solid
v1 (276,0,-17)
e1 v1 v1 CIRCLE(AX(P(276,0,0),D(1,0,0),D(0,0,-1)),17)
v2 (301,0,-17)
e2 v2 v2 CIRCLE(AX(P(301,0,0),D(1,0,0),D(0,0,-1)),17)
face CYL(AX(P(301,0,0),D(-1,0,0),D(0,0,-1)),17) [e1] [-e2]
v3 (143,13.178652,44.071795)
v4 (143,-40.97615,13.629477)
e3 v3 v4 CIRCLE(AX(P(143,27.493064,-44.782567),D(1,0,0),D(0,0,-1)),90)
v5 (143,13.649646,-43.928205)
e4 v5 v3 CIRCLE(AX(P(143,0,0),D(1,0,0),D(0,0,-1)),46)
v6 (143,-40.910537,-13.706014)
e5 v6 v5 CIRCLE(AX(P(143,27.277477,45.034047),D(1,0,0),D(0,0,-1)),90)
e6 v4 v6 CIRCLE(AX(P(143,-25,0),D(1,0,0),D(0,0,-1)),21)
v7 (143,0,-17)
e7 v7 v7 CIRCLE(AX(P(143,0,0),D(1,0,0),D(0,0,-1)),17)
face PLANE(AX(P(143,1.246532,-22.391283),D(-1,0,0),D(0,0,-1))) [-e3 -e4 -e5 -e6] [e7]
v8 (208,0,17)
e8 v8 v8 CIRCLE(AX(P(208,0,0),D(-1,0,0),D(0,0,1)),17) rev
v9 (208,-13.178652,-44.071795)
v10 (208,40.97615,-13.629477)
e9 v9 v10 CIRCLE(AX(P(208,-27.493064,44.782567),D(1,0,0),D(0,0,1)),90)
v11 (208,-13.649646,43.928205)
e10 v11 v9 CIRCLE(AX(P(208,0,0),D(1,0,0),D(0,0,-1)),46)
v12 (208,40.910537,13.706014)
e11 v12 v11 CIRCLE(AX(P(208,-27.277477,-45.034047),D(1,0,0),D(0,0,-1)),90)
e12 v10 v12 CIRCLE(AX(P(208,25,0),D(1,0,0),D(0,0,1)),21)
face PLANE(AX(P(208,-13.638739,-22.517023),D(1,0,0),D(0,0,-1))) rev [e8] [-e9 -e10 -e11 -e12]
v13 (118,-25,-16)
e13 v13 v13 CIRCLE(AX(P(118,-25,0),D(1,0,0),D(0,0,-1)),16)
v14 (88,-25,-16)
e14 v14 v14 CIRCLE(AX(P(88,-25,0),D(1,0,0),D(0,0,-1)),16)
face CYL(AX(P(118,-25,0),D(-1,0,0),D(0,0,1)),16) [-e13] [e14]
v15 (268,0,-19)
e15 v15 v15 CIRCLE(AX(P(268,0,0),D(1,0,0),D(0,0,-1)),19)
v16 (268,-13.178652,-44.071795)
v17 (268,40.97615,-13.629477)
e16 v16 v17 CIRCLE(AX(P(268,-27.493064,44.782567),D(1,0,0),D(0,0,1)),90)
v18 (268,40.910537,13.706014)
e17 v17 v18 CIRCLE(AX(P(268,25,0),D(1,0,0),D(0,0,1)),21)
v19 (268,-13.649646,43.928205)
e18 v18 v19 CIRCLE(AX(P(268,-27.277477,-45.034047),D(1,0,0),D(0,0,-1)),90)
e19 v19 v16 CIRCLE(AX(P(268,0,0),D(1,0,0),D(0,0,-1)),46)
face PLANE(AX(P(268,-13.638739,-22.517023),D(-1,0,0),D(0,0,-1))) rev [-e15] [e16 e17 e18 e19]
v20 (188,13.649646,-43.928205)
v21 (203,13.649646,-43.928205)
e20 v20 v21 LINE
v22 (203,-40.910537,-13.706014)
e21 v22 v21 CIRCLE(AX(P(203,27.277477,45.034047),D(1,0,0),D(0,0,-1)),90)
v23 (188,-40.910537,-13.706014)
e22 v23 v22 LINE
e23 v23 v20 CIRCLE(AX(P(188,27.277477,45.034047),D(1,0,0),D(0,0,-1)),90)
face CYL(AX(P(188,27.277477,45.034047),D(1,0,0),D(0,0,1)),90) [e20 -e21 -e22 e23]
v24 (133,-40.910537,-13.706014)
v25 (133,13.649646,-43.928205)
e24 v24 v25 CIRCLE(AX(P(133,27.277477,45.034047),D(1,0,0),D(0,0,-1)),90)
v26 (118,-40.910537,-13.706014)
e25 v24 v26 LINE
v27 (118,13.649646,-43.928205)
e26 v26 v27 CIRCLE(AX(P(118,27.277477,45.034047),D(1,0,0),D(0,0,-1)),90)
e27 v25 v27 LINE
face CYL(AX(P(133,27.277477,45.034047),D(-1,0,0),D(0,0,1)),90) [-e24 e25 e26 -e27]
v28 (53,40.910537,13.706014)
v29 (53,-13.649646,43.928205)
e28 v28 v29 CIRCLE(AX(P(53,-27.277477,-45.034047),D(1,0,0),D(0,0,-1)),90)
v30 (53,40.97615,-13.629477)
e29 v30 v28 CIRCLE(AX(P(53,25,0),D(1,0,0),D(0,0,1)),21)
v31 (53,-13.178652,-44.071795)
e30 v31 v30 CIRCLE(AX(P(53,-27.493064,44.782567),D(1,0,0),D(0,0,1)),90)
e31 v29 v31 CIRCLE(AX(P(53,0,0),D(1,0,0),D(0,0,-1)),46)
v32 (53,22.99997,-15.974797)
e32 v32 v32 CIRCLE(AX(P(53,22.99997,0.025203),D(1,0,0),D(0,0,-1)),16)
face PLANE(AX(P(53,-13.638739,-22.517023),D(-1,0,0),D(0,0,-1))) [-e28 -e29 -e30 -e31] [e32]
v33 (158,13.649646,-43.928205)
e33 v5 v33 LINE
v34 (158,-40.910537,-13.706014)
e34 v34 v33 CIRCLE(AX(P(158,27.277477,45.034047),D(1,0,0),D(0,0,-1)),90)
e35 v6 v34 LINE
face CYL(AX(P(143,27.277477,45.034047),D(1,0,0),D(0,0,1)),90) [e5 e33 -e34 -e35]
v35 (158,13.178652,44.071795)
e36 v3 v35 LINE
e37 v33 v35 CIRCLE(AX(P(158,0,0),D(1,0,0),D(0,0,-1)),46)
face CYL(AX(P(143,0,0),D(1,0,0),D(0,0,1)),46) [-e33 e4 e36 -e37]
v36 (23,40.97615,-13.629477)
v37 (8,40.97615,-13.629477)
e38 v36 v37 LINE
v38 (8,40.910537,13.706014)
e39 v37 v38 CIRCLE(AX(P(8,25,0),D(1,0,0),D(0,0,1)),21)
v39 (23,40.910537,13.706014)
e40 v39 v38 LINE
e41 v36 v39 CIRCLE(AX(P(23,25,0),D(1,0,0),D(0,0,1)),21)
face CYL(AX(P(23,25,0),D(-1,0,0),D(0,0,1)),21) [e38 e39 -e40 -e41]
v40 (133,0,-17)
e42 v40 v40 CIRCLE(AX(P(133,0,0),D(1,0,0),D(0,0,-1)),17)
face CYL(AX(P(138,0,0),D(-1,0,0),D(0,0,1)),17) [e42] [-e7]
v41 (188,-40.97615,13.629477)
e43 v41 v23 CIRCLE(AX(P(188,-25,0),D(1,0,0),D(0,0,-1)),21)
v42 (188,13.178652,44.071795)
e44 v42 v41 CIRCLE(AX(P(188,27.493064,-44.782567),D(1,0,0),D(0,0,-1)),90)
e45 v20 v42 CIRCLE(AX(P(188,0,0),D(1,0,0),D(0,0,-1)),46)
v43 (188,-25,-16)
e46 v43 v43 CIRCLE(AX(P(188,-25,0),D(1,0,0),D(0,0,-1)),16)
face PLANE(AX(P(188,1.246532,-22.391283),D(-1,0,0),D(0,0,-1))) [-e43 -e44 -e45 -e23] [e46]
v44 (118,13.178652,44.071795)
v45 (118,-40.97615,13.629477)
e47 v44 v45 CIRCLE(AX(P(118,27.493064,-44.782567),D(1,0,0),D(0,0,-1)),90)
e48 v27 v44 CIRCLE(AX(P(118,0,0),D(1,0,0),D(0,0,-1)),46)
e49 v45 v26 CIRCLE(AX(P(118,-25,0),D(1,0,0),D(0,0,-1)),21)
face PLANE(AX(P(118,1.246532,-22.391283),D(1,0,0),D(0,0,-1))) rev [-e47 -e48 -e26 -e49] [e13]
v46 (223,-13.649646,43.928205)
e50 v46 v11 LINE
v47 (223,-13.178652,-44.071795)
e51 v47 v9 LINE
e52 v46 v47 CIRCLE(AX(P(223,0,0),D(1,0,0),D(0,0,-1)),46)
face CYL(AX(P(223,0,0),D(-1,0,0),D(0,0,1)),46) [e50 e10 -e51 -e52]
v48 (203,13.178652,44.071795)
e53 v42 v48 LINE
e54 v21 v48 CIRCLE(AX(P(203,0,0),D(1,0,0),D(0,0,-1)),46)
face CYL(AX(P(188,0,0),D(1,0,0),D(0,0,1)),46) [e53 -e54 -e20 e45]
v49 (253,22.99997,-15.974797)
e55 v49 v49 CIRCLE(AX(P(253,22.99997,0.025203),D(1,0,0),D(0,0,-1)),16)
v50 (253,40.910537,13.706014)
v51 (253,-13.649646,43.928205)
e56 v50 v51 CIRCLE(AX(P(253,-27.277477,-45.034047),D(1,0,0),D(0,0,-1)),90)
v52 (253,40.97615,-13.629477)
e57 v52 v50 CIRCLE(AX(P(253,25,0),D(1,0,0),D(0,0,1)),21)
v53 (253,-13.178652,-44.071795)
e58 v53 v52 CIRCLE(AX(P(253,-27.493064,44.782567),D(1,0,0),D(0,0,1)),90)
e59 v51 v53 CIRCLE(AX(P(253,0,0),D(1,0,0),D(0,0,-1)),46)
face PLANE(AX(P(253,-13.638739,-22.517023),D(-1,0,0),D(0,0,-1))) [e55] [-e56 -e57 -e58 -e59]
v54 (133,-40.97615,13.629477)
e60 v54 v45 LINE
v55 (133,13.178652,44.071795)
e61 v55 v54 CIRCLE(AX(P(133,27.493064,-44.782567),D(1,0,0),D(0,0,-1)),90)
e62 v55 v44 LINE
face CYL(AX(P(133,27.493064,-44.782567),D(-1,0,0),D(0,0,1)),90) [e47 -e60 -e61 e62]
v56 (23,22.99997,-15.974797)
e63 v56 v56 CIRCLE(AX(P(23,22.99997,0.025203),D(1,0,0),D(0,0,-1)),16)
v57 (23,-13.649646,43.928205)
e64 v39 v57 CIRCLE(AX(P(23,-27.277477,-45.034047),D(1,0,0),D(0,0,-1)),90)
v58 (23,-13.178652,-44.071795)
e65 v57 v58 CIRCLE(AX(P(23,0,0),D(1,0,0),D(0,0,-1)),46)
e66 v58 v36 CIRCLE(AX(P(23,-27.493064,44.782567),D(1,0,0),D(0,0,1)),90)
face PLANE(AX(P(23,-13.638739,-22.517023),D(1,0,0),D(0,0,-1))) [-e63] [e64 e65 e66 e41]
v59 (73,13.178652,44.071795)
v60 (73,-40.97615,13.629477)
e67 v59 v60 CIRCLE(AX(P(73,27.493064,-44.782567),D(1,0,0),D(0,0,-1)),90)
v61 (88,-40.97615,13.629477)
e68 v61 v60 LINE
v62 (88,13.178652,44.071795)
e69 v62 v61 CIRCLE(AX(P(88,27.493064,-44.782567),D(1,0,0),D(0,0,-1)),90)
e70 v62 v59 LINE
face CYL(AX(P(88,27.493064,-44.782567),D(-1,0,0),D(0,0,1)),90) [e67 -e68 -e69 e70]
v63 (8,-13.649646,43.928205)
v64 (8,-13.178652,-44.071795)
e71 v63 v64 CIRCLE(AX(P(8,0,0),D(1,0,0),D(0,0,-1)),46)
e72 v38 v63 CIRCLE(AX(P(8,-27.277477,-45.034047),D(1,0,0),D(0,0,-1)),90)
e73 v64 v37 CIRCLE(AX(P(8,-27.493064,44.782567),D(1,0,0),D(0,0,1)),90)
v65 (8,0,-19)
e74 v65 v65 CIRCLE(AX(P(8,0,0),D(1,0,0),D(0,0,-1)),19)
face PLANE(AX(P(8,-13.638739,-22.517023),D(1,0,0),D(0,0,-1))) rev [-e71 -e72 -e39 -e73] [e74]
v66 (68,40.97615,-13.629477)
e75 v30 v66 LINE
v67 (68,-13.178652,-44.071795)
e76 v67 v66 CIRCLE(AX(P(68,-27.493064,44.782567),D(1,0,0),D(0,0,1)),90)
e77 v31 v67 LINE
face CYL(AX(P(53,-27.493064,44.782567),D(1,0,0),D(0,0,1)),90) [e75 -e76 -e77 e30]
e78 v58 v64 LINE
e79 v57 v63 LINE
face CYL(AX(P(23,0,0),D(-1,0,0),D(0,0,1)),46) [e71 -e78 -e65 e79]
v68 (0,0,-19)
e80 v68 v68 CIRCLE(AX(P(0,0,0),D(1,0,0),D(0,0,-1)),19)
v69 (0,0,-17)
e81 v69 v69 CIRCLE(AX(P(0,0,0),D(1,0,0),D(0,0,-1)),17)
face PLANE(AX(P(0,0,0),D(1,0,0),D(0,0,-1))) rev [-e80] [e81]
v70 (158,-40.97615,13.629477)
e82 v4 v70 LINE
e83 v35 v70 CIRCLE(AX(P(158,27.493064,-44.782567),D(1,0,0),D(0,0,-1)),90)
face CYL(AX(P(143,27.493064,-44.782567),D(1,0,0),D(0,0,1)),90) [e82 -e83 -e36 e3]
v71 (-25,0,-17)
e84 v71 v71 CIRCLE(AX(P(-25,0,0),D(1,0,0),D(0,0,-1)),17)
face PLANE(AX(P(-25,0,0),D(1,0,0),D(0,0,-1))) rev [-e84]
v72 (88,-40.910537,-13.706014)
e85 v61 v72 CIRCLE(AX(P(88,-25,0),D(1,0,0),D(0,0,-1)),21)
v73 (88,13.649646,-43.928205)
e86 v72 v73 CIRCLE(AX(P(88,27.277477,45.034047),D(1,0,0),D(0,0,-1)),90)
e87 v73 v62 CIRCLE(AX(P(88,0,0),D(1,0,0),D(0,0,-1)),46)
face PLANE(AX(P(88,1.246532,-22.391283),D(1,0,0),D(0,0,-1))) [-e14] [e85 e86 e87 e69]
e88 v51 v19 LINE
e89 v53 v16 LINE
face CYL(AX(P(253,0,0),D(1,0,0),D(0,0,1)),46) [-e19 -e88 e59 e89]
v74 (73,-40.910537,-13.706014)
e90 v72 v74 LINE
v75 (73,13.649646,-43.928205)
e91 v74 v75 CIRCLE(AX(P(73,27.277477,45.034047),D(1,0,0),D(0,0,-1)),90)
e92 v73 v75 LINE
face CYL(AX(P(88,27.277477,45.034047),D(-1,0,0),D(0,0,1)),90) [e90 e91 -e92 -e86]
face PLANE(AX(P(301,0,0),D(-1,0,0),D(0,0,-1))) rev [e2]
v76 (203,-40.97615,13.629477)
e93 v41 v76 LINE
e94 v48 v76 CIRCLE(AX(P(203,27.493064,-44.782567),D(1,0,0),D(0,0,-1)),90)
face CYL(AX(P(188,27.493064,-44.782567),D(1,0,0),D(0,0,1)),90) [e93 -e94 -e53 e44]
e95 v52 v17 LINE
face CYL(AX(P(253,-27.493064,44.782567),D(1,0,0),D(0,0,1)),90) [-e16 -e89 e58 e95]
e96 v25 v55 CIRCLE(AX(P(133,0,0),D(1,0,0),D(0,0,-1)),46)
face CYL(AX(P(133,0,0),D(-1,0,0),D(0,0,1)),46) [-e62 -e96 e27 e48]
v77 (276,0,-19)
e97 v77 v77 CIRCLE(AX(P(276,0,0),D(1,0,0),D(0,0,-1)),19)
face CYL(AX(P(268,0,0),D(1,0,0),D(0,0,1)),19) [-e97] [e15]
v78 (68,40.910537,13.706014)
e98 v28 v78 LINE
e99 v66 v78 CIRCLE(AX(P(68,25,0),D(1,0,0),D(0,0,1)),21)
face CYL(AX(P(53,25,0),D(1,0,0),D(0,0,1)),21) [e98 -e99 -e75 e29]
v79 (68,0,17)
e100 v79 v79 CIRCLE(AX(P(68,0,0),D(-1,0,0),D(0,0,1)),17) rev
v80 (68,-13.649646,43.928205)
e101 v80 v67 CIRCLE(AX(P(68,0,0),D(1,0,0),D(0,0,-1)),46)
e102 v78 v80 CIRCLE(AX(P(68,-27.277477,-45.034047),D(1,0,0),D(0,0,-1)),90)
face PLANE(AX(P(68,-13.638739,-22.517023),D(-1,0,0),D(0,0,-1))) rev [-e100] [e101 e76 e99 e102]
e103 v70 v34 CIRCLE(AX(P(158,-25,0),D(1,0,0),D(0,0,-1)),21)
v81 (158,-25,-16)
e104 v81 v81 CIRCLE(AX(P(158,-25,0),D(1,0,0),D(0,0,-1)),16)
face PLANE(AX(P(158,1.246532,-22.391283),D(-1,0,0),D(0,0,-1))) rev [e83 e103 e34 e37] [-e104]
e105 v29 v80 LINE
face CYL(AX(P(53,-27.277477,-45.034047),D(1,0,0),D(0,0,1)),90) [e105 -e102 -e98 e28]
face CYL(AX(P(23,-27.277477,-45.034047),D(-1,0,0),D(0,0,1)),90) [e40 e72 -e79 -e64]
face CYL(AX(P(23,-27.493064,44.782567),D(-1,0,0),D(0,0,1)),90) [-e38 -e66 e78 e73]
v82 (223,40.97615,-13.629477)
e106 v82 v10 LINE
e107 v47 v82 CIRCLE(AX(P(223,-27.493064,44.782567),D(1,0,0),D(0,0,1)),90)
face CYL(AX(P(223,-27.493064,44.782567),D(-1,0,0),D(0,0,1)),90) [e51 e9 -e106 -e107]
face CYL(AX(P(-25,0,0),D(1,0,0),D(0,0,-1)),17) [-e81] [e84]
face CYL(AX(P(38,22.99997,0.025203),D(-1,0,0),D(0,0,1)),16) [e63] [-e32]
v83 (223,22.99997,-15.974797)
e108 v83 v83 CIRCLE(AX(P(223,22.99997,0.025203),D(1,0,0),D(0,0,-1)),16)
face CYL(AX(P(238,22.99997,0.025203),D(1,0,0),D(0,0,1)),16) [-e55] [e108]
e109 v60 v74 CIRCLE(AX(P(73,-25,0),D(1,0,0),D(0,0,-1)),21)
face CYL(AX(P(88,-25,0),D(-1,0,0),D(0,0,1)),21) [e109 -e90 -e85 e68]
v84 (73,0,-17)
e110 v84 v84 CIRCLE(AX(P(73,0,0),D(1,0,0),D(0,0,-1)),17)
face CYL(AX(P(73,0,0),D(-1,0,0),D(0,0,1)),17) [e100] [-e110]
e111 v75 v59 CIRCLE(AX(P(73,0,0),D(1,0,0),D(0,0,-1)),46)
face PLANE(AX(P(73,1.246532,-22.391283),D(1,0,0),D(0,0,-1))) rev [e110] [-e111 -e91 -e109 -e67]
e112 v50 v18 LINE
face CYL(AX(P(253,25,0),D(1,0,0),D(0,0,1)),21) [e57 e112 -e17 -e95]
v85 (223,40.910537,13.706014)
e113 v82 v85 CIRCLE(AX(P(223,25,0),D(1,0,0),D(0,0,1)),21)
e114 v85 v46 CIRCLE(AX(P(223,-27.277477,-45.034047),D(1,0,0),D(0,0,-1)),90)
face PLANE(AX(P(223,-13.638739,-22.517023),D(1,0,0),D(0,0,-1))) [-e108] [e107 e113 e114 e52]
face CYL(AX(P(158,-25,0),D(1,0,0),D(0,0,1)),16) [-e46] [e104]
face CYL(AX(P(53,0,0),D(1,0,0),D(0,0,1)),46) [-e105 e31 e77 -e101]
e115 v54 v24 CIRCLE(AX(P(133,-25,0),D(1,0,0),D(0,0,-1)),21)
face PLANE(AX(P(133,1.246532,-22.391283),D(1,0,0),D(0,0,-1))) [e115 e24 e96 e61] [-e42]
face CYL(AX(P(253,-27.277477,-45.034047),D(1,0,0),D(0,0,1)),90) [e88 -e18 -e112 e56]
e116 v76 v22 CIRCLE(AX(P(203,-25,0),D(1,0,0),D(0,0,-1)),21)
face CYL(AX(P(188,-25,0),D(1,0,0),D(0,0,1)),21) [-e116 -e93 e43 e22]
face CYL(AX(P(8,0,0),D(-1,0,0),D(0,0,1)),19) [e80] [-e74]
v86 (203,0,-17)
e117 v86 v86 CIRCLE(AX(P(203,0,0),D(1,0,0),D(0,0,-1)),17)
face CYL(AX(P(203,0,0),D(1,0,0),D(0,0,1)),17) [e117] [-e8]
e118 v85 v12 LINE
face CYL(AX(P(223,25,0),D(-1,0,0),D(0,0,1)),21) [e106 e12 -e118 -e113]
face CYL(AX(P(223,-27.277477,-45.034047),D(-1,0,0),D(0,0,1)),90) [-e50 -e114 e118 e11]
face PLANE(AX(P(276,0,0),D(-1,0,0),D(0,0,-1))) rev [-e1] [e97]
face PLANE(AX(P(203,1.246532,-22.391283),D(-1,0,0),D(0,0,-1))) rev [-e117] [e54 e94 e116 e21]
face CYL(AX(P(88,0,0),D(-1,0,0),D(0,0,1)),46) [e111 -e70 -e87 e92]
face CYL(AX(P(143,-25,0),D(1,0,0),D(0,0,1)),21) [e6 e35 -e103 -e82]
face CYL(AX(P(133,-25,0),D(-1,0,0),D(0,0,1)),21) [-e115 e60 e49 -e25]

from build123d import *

# Parameters (mm, degrees)
SKETCH1_R            = 17
BOSS_EXTRUDE3_DEPTH  = 25
SKETCH1_5_R          = 19
BOSS_EXTRUDE4_DEPTH  = 8
BOSS_EXTRUDE5_DEPTH  = 15
SKETCH3_R            = 16
BOSS_EXTRUDE6_DEPTH  = 15
MIRROR1_START        = 53
MIRROR1_DEPTH        = 15
MIRROR1_START_2      = 38
MIRROR1_2_OUTLINE_R  = 16
MIRROR1_2_DEPTH      = 15
BOSS_EXTRUDE7_START  = 5
SKETCH4_R            = 17
BOSS_EXTRUDE7_DEPTH  = 5
BOSS_EXTRUDE8_DEPTH  = 15
SKETCH6_R            = 16
BOSS_EXTRUDE9_DEPTH  = 30
BOSS_EXTRUDE10_DEPTH = 15
BOSS_EXTRUDE11_START = 5
SKETCH8_R            = 17
BOSS_EXTRUDE11_DEPTH = 5


# Read off the part's stored shape, not the designer's step: Mirror1
with BuildPart() as part:
    # Sketch1 → Boss-Extrude3 (new body)
    with BuildSketch(Plane(origin=(0, 0, 0), x_dir=(0, 0, -1), z_dir=(1, 0, 0))):
        Circle(SKETCH1_R)
    extrude(amount=-BOSS_EXTRUDE3_DEPTH)

    # Sketch1<5> → Boss-Extrude4 (add)
    with BuildSketch(Plane(origin=(0, 0, 0), x_dir=(0, 0, -1), z_dir=(1, 0, 0))):
        Circle(SKETCH1_5_R)
    extrude(amount=BOSS_EXTRUDE4_DEPTH)

    # Sketch2 → Boss-Extrude5 (add)
    with BuildSketch(Plane(origin=(8, 0, 0), x_dir=(0, 0, -1), z_dir=(1, 0, 0))):
        with BuildLine():
            ThreePointArc((-13.706014257, 40.910536546), (-0.050406066, 45.999939505), (13.629476778, 40.97614981))
            ThreePointArc((13.629476778, 40.97614981), (33.671459186, 16.608703248), (44.071795254, -13.178651794))
            ThreePointArc((44.071795254, -13.178651794), (0.246197834, -45.999341154), (-43.928204746, -13.649645701))
            ThreePointArc((-43.928204746, -13.649645701), (-33.694579877, 16.332192974), (-13.706014257, 40.910536546))
        make_face()
    extrude(amount=BOSS_EXTRUDE5_DEPTH)

    # Sketch3 → Boss-Extrude6 (add)
    with BuildSketch(Plane(origin=(23, 0, 0), x_dir=(0, 0, -1), z_dir=(1, 0, 0))):
        with Locations((-0.025203033, 22.999969753)):
            Circle(SKETCH3_R)
    extrude(amount=BOSS_EXTRUDE6_DEPTH)



with BuildPart() as body_2:
    # Mirror1 outline → Mirror1 (new body)
    with BuildSketch(Plane.YZ.offset(MIRROR1_START)):
        with BuildLine():
            ThreePointArc((40.97614981, -13.629476778), (45.999939505, 0.050406066), (40.910536546, 13.706014257))
            ThreePointArc((40.910536546, 13.706014257), (16.332192974, 33.694579877), (-13.649645701, 43.928204746))
            ThreePointArc((-13.649645701, 43.928204746), (-45.999341154, -0.246197834), (-13.178651794, -44.071795254))
            ThreePointArc((-13.178651794, -44.071795254), (16.608703248, -33.671459186), (40.97614981, -13.629476778))
        make_face()
    extrude(amount=MIRROR1_DEPTH)


with BuildPart() as part_1:
    add(part.part)

    add(body_2.part)  # Mirror1 2 merges body 2
    # Mirror1 2 outline → Mirror1 2 (add)
    with BuildSketch(Plane.YZ.offset(MIRROR1_START_2)):
        with Locations((22.999969753, 0.025203033)):
            Circle(MIRROR1_2_OUTLINE_R)
    extrude(amount=MIRROR1_2_DEPTH)

    # Sketch4 → Boss-Extrude7 (add)
    with BuildSketch(Plane(origin=(68, 0, 0), x_dir=(0, 0, -1), z_dir=(1, 0, 0)).offset(BOSS_EXTRUDE7_START)):
        Circle(SKETCH4_R)
    extrude(amount=-BOSS_EXTRUDE7_DEPTH)

    # Sketch5 → Boss-Extrude8 (add)
    with BuildSketch(Plane(origin=(73, 0, 0), x_dir=(0, 0, -1), z_dir=(1, 0, 0))):
        with BuildLine():
            ThreePointArc((-13.629476778, -40.97614981), (0.050406066, -45.999939505), (13.706014257, -40.910536546))
            ThreePointArc((13.706014257, -40.910536546), (33.694579877, -16.332192974), (43.928204746, 13.649645701))
            ThreePointArc((43.928204746, 13.649645701), (-0.246197834, 45.999341154), (-44.071795254, 13.178651794))
            ThreePointArc((-44.071795254, 13.178651794), (-33.671459186, -16.608703248), (-13.629476778, -40.97614981))
        make_face()
    extrude(amount=BOSS_EXTRUDE8_DEPTH)

    # Sketch6 → Boss-Extrude9 (add)
    with BuildSketch(Plane(origin=(88, 0, 0), x_dir=(0, 0, -1), z_dir=(1, 0, 0))):
        with Locations((0, -25)):
            Circle(SKETCH6_R)
    extrude(amount=BOSS_EXTRUDE9_DEPTH)

    # Sketch7 → Boss-Extrude10 (add)
    with BuildSketch(Plane(origin=(118, 0, 0), x_dir=(0, 0, -1), z_dir=(1, 0, 0))):
        with BuildLine():
            ThreePointArc((-13.629476778, -40.97614981), (0.050406066, -45.999939505), (13.706014257, -40.910536546))
            ThreePointArc((13.706014257, -40.910536546), (33.694579877, -16.332192974), (43.928204746, 13.649645701))
            ThreePointArc((43.928204746, 13.649645701), (-0.246197834, 45.999341154), (-44.071795254, 13.178651794))
            ThreePointArc((-44.071795254, 13.178651794), (-33.671459186, -16.608703248), (-13.629476778, -40.97614981))
        make_face()
    extrude(amount=BOSS_EXTRUDE10_DEPTH)

    # Sketch8 → Boss-Extrude11 (add)
    with BuildSketch(Plane(origin=(133, 0, 0), x_dir=(0, 0, -1), z_dir=(1, 0, 0)).offset(BOSS_EXTRUDE11_START)):
        Circle(SKETCH8_R)
    extrude(amount=-BOSS_EXTRUDE11_DEPTH)

    # Mirror2: part across plane


with BuildPart() as part_2:
    add(part_1.part)
    add(part_1.part.mirror(Plane(origin=(138, 0, 0), x_dir=(0, 0, 1), z_dir=(1, 0, 0))))


solid = part_2.part
